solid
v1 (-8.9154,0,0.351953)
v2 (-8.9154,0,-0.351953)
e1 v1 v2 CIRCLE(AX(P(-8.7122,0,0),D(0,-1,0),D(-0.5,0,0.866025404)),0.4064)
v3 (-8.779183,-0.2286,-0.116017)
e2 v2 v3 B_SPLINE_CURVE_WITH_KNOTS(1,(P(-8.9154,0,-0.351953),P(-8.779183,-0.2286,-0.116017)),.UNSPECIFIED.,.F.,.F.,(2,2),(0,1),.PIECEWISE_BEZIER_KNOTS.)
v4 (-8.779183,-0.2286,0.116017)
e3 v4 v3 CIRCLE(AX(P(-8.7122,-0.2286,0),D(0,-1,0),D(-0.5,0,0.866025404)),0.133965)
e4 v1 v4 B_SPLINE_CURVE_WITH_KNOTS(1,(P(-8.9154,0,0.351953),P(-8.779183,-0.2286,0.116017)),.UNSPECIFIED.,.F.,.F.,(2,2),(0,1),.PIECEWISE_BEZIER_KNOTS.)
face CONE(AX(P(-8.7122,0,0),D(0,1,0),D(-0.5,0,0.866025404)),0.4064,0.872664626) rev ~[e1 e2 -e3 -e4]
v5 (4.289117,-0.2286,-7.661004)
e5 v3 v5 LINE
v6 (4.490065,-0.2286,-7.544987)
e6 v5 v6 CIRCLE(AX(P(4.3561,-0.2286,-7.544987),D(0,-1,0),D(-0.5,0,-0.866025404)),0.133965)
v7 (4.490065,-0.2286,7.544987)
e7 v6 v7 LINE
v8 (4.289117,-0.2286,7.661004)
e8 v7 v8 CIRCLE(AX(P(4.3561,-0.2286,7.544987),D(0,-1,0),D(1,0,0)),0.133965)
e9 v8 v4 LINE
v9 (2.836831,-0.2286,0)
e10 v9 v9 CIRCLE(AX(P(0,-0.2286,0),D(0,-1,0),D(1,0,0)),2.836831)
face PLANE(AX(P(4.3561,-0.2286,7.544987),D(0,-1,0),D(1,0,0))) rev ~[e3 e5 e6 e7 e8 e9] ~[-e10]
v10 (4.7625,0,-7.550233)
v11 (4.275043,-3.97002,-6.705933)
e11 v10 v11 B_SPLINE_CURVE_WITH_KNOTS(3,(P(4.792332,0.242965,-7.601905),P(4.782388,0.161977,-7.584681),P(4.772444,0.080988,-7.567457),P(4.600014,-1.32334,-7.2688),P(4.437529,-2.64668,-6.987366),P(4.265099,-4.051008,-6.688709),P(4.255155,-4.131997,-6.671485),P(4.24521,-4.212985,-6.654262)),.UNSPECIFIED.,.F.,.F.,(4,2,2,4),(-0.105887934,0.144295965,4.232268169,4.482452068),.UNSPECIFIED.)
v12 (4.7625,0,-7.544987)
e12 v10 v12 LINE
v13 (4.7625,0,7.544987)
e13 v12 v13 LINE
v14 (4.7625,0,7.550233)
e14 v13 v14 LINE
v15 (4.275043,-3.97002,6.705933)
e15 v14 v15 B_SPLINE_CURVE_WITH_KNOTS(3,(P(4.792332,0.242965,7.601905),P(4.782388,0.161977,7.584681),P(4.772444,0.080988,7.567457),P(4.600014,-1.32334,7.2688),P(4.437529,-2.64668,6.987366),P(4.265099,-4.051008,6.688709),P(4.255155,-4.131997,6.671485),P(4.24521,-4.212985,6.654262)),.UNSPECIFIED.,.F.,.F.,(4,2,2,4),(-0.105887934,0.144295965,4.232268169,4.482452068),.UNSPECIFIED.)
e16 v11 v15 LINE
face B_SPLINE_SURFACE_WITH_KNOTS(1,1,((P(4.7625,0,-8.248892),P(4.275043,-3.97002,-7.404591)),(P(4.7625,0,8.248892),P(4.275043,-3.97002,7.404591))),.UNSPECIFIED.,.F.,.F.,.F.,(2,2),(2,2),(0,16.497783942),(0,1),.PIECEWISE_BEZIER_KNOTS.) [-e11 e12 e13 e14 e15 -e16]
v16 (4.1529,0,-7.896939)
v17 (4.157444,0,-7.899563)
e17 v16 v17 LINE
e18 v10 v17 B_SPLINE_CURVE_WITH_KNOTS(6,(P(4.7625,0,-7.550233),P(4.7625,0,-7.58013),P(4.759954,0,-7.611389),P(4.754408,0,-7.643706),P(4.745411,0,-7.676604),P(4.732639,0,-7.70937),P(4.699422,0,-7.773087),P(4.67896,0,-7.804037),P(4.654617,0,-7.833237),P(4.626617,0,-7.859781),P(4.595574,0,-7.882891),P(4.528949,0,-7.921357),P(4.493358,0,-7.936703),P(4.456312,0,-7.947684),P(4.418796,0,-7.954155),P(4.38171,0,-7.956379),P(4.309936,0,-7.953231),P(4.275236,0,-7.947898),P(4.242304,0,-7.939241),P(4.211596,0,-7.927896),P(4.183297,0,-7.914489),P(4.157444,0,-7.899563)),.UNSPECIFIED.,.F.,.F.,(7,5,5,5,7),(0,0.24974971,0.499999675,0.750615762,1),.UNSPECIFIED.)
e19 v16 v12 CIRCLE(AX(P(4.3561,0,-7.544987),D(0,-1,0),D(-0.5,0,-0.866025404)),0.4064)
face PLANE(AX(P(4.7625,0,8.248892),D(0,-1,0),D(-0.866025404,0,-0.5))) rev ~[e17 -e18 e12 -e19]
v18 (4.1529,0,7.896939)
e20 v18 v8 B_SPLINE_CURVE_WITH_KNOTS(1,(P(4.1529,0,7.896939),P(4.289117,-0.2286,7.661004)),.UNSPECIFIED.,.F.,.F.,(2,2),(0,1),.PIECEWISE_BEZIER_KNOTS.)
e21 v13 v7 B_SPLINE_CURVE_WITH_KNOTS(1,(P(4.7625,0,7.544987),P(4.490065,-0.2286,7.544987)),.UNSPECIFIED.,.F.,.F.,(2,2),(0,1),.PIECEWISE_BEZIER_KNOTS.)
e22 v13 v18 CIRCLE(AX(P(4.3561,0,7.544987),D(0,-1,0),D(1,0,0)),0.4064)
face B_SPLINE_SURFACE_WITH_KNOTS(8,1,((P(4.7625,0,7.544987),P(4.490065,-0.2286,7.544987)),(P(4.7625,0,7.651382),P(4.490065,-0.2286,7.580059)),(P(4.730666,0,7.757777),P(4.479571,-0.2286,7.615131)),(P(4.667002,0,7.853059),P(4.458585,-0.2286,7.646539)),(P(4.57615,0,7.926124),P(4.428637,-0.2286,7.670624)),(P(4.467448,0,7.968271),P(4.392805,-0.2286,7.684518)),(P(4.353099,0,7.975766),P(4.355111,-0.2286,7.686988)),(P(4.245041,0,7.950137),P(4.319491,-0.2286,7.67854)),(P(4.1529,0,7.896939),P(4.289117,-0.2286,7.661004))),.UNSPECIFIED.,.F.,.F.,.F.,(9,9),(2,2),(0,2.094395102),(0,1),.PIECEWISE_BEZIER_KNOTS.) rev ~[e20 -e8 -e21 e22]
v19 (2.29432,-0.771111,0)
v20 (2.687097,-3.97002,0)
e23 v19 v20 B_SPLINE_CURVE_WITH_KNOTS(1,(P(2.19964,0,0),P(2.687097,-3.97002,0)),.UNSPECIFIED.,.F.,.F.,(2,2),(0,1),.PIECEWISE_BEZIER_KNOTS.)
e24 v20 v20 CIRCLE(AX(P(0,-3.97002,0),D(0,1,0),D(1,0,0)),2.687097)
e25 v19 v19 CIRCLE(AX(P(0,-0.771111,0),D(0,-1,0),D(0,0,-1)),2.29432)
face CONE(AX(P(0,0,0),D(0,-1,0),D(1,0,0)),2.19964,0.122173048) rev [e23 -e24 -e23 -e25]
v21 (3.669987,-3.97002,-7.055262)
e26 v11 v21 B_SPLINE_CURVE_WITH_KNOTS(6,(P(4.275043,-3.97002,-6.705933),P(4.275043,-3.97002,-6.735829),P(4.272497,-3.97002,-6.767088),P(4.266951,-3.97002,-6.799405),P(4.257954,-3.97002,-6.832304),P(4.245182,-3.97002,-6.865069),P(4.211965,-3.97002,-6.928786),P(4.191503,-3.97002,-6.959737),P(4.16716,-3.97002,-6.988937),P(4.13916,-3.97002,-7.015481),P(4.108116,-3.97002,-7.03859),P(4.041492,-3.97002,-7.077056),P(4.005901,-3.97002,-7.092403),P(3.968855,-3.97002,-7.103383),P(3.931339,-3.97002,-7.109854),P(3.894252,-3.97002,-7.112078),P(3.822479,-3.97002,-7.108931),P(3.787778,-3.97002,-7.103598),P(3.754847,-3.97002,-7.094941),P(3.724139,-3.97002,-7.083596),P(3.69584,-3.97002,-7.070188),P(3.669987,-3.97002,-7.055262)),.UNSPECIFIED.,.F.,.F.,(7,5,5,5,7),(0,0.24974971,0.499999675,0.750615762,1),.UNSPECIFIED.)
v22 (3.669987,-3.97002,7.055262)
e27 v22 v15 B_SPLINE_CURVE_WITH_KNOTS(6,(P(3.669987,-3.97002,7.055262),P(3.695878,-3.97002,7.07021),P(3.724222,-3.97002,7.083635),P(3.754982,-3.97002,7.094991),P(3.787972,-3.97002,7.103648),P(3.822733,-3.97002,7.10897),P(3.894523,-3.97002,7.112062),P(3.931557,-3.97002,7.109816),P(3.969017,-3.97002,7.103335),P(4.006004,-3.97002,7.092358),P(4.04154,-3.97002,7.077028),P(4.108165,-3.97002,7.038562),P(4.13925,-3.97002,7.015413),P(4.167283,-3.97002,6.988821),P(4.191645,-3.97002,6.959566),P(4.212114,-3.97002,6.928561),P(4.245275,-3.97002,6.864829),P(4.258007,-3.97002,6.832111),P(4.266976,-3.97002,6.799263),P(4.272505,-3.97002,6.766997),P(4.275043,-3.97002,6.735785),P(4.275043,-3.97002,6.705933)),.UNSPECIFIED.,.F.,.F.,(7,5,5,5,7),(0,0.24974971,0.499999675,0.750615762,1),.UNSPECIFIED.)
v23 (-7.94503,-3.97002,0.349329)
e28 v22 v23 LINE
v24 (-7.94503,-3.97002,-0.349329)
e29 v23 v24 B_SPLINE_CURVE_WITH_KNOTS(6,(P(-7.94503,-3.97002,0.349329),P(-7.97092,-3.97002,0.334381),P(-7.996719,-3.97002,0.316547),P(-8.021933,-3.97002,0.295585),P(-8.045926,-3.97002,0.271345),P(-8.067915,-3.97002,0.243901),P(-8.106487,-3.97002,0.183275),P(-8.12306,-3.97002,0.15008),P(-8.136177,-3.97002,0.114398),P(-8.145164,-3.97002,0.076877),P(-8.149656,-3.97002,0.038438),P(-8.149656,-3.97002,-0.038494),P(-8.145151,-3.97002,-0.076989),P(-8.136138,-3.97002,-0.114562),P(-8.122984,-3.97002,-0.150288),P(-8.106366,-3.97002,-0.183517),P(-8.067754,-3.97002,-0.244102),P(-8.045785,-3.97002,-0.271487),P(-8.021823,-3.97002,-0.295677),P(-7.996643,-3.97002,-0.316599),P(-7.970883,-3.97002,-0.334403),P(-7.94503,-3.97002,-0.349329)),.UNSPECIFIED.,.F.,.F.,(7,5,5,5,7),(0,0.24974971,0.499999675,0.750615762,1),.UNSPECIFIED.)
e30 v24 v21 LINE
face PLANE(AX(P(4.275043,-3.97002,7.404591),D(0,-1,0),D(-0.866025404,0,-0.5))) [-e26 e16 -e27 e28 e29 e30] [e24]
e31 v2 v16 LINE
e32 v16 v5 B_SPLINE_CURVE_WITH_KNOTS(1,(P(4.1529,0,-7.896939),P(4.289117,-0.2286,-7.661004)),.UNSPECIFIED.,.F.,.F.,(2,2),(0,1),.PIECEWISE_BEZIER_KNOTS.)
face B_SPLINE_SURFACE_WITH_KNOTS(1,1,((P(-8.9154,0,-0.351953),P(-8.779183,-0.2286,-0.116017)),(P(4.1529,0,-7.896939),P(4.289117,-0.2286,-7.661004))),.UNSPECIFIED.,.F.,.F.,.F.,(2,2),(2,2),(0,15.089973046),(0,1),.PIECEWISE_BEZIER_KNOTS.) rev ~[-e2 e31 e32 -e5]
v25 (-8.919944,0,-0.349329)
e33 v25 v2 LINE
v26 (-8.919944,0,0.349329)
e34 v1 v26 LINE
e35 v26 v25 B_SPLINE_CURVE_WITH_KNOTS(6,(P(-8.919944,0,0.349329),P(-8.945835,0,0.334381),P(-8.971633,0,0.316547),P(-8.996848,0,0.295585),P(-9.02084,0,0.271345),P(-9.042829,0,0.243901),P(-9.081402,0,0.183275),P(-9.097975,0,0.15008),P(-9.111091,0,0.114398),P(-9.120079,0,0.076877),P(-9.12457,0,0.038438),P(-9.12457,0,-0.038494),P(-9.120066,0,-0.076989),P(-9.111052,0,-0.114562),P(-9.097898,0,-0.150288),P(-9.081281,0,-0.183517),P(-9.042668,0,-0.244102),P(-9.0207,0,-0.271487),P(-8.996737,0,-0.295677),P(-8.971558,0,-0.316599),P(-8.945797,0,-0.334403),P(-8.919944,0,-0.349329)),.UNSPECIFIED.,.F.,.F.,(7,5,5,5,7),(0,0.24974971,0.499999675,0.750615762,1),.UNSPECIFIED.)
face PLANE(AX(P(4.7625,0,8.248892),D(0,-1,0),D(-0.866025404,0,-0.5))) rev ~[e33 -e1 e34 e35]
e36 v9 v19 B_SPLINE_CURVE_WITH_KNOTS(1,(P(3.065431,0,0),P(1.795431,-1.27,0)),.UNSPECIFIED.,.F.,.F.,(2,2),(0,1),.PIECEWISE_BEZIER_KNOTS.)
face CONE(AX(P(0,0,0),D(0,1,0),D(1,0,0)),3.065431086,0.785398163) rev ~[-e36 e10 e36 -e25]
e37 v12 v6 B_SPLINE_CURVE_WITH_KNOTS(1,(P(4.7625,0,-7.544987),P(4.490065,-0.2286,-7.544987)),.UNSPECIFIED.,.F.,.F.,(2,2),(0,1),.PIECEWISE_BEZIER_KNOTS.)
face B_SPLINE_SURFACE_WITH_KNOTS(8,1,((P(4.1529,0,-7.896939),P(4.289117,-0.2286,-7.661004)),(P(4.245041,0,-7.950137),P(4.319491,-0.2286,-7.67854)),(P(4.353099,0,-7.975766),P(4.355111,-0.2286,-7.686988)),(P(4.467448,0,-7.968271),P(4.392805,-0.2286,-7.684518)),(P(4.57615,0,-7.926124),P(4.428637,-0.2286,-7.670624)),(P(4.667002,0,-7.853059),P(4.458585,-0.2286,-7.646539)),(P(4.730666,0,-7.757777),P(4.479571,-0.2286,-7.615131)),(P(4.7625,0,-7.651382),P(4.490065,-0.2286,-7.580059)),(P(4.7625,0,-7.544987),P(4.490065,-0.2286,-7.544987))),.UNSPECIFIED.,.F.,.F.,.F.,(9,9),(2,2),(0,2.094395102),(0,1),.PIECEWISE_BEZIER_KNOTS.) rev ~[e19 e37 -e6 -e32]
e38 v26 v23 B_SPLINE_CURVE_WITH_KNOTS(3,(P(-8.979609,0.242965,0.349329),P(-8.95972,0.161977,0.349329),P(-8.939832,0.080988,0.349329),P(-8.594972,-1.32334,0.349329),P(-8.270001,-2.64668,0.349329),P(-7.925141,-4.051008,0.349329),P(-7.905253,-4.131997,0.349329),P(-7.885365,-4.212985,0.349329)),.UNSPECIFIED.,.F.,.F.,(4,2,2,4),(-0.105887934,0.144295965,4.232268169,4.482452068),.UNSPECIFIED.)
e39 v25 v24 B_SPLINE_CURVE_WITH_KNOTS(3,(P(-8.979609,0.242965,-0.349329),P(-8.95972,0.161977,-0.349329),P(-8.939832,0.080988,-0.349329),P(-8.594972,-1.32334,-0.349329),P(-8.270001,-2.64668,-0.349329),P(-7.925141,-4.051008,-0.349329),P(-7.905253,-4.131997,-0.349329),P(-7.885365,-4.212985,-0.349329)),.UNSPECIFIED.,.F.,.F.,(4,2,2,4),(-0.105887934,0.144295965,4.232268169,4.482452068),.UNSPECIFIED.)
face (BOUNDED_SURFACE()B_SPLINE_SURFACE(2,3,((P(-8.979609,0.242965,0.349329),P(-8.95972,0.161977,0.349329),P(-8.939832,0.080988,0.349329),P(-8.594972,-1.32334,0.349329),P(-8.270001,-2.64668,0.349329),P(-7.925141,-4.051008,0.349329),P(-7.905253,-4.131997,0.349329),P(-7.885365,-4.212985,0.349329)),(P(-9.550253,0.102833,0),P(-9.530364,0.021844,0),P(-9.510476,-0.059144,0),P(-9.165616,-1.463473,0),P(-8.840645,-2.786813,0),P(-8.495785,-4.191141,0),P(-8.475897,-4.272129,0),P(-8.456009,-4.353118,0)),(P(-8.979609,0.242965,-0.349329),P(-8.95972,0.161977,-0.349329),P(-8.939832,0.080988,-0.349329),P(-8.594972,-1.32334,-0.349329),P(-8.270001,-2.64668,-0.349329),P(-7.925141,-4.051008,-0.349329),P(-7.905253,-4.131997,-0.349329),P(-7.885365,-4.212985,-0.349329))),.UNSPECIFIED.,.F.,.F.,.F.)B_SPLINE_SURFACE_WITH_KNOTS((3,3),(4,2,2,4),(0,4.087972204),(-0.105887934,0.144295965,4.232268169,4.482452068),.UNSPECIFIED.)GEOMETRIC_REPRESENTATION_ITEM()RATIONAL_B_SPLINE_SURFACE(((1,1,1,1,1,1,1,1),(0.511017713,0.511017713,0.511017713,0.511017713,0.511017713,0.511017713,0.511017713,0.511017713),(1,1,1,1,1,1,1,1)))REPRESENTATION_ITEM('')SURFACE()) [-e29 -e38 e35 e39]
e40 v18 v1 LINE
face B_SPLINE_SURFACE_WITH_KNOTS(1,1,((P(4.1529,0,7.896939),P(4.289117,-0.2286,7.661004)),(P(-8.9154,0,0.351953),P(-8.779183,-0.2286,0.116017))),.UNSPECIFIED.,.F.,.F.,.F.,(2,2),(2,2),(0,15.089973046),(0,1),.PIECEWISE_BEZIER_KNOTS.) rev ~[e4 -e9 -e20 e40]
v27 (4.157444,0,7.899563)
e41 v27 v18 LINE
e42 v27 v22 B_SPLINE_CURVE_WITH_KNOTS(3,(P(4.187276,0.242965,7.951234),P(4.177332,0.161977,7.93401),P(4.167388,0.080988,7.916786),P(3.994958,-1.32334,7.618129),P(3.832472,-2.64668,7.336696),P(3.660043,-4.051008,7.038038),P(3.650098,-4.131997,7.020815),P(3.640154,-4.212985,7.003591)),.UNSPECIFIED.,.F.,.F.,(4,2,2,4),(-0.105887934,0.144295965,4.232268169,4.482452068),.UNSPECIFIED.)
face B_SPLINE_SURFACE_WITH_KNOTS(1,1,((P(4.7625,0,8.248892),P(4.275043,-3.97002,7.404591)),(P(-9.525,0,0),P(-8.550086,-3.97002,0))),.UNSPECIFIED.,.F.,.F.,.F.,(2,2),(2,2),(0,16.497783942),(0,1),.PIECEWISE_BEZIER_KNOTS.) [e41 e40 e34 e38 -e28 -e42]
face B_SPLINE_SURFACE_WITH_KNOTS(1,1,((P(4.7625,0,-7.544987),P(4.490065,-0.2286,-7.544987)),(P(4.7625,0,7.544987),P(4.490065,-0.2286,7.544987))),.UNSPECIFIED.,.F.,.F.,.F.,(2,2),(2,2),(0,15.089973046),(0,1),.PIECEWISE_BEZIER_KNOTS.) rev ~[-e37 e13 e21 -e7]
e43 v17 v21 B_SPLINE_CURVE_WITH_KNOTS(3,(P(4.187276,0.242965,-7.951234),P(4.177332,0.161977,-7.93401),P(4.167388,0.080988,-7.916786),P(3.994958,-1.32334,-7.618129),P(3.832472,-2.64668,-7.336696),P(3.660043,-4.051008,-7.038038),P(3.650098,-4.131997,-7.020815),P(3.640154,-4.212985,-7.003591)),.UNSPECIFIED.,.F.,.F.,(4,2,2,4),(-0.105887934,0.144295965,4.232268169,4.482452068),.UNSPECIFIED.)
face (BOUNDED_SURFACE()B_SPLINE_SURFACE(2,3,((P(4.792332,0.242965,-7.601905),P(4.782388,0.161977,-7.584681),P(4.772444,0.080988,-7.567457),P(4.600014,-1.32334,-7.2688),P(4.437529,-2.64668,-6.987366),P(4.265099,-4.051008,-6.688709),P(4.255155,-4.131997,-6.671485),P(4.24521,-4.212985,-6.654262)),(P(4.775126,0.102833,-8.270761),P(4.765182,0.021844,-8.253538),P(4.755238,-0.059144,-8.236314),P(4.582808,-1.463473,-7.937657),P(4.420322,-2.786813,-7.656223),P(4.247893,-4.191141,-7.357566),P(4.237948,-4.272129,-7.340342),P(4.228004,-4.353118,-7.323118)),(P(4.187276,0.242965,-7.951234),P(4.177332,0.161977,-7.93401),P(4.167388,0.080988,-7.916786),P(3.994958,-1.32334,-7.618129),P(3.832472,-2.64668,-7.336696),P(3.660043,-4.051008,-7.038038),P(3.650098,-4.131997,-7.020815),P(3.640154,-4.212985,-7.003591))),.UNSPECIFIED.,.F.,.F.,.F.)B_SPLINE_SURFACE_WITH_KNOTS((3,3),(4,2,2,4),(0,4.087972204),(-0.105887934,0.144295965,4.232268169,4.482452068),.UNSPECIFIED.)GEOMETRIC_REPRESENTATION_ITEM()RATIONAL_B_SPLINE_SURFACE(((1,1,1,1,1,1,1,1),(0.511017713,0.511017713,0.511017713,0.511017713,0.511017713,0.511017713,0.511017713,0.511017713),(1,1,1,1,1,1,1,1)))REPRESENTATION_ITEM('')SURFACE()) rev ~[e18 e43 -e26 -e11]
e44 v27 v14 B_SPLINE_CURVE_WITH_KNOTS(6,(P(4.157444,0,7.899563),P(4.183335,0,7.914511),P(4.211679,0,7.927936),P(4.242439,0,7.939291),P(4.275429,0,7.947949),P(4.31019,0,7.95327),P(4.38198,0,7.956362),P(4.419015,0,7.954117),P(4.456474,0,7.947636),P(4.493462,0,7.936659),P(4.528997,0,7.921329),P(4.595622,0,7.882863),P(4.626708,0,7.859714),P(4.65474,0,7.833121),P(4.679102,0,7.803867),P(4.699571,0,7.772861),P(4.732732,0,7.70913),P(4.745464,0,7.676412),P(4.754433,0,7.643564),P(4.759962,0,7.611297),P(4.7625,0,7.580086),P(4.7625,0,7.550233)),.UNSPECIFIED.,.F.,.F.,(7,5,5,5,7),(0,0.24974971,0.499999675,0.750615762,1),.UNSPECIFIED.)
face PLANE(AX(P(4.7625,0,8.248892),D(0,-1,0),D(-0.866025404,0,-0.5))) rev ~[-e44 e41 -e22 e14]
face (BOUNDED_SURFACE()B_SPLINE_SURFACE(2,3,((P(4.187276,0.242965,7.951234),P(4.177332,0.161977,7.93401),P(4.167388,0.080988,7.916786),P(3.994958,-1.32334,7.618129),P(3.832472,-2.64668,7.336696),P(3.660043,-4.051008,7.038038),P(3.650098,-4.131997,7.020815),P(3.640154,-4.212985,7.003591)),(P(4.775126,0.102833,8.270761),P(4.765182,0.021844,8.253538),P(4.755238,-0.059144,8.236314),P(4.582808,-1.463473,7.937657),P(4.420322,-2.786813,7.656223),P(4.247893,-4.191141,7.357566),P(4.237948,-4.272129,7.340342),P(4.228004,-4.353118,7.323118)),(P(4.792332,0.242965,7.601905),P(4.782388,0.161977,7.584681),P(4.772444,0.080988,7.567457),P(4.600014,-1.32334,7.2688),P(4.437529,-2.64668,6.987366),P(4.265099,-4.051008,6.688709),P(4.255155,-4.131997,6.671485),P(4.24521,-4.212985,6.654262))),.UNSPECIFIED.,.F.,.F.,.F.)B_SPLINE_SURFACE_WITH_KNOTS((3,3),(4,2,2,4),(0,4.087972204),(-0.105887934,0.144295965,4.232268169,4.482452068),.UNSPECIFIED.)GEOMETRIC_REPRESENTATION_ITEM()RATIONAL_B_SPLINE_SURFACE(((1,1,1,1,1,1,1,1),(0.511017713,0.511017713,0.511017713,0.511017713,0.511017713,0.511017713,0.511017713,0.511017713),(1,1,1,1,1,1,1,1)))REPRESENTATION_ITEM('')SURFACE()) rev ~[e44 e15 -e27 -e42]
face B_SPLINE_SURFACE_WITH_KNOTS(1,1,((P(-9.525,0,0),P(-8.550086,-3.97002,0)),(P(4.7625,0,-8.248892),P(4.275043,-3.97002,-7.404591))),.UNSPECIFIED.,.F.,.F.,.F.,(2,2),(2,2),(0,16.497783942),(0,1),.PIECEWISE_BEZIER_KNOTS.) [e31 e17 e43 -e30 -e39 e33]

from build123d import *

# Parameters (mm, degrees)
F0_R     = 2.19964
F1_DEPTH = 3.97002
F1_TAPER = 7
F2_R     = 0.4064
F3_R     = 3.065431086
F4_DEPTH = 1.27
F4_TAPER = 45
F6_DEPTH = 0.2286
F6_TAPER = 50


# Not quite as in the source:
# - a feature names something its author has since deleted; it is built from what else it names


with BuildPart() as f1:
    # F0 (on Front) → F1 (new body)
    with BuildSketch(Plane.XZ):
        Polygon((4.7625, 8.248891971), (-9.525, 0), (4.7625, -8.248891971), align=None)
        Circle(F0_R, mode=Mode.SUBTRACT)
    extrude(amount=F1_DEPTH, taper=F1_TAPER)

    # F2
    f2_edges = [f1.edges().sort_by_distance(p)[0] for p in [
        (-9.037543, -1.98501, 0),
        (4.518771, -1.98501, 7.826742),
        (4.518771, -1.98501, -7.826742),
    ]]
    fillet(f2_edges, radius=F2_R)

    # F3 (on face) → F4 (cut)
    with BuildSketch(Plane.XZ):
        Circle(F3_R)
    extrude(amount=F4_DEPTH, taper=F4_TAPER, mode=Mode.SUBTRACT)

    # F5 (on face) → F6 (cut)
    with BuildSketch(Plane.XZ):
        with BuildLine():
            ThreePointArc((4.7625, 7.5449865229), (4.5593, 7.8969392469), (4.1529, 7.8969392469))
            Line((4.1529, 7.8969392469), (-8.9154, 0.3519527241))
            ThreePointArc((-8.9154, 0.3519527241), (-9.1186, 0), (-8.9154, -0.3519527241))
            Line((-8.9154, -0.3519527241), (4.1529, -7.8969392469))
            ThreePointArc((4.1529, -7.8969392469), (4.5593, -7.8969392469), (4.7625, -7.5449865229))
            Line((4.7625, -7.5449865229), (4.7625, 7.5449865229))
        make_face()
    extrude(amount=F6_DEPTH, taper=F6_TAPER, mode=Mode.SUBTRACT)


solid = f1.part
